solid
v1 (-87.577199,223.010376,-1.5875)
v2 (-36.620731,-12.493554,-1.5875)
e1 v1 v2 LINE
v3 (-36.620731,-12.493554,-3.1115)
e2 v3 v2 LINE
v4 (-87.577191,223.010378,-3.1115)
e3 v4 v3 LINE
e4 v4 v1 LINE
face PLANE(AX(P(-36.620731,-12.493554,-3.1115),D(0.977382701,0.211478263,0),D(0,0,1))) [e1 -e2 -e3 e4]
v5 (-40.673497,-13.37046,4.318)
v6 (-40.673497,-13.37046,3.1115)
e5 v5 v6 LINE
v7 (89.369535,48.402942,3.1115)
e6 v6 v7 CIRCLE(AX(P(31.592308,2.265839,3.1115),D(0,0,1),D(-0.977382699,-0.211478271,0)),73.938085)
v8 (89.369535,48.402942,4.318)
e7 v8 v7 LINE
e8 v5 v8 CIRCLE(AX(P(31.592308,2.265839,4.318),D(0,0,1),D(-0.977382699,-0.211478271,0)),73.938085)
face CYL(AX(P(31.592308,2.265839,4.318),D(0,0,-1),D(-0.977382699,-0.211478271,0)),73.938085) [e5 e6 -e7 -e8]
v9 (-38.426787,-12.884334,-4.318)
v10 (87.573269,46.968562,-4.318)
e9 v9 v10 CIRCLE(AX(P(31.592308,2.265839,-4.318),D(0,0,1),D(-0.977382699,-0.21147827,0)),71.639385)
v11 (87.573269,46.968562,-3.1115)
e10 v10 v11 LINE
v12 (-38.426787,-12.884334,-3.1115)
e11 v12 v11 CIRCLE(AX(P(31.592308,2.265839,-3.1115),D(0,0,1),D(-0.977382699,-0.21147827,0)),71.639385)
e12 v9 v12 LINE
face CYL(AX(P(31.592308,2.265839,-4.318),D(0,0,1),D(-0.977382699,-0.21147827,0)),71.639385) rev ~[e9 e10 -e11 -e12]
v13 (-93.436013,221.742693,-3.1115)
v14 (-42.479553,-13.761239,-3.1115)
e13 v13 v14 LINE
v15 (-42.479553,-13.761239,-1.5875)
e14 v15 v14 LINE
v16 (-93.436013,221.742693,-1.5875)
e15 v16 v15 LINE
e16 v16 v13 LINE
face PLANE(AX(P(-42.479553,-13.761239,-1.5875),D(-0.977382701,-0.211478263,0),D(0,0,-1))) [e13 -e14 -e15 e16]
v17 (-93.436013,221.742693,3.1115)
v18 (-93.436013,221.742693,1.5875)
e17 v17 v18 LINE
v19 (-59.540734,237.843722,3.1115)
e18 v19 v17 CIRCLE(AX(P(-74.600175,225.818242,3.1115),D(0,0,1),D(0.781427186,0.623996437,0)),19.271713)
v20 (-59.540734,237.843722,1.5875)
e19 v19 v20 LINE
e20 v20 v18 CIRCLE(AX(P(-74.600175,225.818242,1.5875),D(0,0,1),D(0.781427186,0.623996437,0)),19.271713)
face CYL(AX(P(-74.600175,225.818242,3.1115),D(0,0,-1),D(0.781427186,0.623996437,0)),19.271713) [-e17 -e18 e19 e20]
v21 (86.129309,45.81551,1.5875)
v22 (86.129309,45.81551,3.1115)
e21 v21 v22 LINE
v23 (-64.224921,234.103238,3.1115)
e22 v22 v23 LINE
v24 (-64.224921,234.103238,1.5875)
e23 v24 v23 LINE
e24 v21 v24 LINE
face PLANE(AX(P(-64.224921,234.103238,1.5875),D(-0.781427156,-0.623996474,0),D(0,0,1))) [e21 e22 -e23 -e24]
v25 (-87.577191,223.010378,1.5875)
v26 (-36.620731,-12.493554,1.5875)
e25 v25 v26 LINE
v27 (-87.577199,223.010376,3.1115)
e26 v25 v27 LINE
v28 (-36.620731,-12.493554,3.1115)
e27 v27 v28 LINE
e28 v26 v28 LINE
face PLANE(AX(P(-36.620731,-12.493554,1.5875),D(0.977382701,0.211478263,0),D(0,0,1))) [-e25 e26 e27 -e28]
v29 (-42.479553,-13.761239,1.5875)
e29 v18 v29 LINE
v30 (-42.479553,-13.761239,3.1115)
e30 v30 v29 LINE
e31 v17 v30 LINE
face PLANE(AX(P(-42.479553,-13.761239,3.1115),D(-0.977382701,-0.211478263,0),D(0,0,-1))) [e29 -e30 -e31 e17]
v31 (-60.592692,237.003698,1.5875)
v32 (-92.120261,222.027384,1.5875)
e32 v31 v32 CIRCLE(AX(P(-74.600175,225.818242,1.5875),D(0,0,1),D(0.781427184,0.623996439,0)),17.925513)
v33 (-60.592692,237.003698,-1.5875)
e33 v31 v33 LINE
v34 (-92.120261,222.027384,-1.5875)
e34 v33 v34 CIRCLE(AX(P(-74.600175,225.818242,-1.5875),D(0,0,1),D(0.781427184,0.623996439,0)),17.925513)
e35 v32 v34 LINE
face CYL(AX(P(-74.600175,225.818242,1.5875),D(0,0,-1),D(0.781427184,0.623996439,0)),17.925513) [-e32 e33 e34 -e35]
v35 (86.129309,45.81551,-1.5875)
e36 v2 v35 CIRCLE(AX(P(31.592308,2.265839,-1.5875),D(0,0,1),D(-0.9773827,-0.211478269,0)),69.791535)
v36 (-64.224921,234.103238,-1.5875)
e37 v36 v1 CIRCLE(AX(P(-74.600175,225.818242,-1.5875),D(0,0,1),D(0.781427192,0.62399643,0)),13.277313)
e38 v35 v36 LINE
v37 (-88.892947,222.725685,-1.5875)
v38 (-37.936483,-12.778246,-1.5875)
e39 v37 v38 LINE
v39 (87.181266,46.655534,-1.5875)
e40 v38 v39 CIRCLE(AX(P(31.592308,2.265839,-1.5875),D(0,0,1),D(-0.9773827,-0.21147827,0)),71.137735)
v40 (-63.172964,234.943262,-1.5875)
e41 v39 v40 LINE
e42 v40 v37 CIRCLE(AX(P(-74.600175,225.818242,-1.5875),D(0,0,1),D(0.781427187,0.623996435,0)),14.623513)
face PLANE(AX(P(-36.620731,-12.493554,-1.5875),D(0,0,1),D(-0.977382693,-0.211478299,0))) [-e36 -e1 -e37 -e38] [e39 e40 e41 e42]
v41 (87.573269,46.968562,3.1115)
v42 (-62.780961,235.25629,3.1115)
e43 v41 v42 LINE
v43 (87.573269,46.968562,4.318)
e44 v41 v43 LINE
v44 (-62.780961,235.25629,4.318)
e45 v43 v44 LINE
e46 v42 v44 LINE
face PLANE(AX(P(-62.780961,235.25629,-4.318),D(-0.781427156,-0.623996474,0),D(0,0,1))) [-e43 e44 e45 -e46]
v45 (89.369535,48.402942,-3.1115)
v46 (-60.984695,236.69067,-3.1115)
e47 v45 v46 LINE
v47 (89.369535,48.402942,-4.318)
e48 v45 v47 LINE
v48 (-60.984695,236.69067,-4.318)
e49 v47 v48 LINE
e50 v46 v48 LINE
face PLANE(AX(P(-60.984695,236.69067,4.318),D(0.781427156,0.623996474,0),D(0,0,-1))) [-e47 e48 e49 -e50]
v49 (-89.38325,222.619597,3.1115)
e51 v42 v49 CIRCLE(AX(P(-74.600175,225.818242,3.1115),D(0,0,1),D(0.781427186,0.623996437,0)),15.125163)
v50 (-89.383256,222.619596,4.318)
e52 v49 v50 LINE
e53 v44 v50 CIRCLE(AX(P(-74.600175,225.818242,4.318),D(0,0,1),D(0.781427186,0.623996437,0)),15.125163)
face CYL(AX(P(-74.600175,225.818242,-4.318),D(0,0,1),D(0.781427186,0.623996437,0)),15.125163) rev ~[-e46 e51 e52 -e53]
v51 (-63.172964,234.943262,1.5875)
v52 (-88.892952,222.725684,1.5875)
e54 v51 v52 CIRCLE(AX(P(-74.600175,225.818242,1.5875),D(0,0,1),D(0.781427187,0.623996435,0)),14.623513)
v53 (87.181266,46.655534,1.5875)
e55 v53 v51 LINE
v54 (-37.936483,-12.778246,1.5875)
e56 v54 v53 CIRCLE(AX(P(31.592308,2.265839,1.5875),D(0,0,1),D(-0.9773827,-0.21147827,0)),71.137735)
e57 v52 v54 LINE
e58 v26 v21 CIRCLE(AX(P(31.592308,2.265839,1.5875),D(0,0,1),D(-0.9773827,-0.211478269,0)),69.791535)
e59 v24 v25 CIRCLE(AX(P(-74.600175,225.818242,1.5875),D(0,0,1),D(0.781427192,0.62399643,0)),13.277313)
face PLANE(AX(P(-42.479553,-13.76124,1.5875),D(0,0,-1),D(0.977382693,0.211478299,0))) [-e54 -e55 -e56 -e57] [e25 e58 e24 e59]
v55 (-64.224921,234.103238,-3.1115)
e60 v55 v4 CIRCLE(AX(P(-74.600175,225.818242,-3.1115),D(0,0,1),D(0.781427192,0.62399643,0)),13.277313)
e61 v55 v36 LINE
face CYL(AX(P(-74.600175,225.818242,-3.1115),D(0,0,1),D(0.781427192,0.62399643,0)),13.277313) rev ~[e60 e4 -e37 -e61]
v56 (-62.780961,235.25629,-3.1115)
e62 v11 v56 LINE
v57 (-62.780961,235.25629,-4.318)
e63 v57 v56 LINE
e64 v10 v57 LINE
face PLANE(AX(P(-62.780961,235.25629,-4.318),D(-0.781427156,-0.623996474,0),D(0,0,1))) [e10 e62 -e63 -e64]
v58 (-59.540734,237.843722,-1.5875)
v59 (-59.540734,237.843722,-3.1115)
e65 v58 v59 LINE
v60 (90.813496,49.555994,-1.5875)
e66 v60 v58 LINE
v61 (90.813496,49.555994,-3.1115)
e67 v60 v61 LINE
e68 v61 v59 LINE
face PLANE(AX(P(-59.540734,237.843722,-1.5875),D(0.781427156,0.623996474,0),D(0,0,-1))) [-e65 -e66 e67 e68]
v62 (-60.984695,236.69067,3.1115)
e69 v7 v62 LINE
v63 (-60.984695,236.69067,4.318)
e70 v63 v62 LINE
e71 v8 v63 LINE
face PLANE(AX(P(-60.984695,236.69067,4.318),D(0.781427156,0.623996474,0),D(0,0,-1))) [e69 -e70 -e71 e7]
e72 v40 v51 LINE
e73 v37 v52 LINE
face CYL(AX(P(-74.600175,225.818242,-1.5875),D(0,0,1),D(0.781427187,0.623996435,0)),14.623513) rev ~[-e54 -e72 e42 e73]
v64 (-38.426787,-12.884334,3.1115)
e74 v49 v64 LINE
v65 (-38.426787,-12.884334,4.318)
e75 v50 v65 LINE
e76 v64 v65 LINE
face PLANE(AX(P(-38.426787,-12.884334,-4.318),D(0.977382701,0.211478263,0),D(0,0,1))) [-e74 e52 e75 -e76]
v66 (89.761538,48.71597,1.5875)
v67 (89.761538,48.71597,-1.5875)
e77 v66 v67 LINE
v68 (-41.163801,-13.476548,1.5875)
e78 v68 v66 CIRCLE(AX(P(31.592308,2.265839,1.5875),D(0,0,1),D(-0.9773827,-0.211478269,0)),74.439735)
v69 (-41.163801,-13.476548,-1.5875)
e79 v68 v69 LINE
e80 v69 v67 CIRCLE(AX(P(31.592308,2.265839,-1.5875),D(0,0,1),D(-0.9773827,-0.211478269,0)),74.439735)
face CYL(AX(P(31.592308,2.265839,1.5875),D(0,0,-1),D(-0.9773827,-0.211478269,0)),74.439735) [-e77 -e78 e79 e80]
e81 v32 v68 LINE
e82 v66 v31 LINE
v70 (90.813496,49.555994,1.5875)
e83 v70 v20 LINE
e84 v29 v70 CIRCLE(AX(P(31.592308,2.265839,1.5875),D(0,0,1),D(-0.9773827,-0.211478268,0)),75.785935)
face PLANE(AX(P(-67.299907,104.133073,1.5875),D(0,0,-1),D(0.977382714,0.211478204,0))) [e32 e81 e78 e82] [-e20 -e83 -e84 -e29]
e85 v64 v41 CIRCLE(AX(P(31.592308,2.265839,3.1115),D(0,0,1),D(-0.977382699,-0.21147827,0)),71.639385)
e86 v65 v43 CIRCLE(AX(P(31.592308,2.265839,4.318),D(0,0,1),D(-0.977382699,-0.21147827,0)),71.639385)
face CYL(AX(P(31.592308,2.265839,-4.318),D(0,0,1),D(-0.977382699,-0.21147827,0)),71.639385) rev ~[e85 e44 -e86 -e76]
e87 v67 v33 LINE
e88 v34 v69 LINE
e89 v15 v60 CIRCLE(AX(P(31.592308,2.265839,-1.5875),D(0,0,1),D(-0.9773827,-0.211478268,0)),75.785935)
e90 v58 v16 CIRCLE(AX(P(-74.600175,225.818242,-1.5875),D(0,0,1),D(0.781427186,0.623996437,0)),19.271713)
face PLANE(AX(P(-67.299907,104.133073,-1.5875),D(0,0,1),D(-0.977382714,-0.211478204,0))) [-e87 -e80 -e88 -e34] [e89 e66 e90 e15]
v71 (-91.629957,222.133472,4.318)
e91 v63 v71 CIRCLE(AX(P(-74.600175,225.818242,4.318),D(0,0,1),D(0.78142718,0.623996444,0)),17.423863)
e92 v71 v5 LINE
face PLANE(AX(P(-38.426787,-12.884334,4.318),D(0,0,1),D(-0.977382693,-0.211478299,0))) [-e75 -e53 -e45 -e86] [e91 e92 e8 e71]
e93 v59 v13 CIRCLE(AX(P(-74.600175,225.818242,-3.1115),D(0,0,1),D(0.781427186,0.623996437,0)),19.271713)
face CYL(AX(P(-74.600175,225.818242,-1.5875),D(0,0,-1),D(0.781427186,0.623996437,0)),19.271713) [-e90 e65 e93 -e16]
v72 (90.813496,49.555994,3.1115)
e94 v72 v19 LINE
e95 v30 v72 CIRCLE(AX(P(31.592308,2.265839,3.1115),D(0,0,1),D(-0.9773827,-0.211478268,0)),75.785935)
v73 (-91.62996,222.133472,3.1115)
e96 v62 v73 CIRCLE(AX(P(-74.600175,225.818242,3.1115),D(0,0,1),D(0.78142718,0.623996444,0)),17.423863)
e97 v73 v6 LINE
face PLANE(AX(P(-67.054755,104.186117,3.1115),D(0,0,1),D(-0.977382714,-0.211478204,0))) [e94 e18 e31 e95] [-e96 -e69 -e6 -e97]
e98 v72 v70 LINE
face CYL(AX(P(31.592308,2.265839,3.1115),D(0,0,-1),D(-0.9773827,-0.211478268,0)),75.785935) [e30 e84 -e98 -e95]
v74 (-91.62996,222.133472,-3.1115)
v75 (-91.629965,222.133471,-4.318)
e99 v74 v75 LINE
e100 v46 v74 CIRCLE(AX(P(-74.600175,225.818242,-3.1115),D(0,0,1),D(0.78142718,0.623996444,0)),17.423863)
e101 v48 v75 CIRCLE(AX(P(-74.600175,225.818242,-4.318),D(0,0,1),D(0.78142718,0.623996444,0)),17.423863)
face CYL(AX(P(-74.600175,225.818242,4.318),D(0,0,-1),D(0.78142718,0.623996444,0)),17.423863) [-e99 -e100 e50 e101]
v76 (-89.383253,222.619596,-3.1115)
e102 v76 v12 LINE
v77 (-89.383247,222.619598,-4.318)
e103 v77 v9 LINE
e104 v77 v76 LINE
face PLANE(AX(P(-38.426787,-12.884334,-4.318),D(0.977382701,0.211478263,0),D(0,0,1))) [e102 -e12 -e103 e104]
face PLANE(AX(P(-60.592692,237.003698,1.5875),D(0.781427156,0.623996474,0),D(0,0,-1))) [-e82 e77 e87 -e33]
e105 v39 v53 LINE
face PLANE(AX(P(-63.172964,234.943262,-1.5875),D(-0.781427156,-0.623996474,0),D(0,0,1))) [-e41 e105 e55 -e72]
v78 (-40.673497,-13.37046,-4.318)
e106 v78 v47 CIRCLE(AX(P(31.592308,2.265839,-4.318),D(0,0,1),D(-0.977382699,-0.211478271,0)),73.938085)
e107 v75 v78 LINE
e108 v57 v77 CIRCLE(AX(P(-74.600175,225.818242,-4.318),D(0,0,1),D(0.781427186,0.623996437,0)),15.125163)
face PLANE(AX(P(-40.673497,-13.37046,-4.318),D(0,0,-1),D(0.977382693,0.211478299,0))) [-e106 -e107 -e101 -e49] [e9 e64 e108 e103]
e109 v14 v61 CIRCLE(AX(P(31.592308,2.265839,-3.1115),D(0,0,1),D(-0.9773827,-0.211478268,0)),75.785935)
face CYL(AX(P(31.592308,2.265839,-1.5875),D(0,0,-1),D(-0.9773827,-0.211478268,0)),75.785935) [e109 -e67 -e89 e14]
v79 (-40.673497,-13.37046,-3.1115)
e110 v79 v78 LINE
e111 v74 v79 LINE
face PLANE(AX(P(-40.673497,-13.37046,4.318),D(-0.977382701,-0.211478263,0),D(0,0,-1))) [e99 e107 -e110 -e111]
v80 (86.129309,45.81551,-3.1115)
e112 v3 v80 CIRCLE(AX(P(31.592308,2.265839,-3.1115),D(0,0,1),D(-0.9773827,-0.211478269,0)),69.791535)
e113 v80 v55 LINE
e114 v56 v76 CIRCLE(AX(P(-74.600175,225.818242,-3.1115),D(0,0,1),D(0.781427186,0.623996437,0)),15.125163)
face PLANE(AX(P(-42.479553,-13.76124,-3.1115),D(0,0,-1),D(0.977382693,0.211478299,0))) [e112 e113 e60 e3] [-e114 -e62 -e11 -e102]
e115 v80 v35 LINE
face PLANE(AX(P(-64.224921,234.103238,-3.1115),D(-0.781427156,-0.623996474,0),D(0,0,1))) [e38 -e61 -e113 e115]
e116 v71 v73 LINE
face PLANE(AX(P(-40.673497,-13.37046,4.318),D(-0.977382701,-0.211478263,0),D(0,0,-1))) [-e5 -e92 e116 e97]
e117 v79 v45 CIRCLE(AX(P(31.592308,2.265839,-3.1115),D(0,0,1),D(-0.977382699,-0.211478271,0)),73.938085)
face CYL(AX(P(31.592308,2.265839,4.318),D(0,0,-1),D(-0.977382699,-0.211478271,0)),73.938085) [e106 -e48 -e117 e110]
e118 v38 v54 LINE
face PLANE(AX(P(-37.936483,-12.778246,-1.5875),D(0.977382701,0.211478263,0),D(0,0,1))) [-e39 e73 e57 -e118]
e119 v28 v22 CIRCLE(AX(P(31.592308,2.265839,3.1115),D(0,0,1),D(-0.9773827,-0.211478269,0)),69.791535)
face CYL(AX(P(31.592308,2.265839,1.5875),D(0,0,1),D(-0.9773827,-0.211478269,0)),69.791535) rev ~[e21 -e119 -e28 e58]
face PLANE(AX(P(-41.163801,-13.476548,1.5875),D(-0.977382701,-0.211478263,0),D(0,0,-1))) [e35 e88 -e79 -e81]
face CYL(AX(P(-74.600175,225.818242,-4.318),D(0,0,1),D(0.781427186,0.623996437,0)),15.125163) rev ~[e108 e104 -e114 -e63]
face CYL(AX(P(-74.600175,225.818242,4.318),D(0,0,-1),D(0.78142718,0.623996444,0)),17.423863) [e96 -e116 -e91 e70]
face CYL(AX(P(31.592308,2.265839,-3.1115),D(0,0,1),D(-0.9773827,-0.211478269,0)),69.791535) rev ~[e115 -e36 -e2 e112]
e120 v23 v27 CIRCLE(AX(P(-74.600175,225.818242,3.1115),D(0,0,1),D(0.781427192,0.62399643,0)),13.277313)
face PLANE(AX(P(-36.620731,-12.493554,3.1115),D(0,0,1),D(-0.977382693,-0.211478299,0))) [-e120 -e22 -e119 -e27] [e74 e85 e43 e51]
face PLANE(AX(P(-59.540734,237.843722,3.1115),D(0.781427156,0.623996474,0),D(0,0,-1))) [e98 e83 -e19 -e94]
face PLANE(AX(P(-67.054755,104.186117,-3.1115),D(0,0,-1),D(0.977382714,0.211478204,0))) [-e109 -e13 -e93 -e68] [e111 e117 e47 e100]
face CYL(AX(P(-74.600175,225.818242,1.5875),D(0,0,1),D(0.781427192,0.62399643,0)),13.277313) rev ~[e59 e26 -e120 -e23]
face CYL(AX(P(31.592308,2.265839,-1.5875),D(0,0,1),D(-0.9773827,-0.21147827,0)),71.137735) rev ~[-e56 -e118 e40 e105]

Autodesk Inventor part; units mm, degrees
ref_plane "Work Plane2" through (-74.600175, 225.818241, 0) normal (0.9238795, 0.3826834, 0) x (0, 0, 1)
ref_plane "Work Plane3" through (31.592308, 2.265839, 0) normal (-0.5701833, 0.8215175, 0) x (0, 0, 1)
sketch "Path" plane through (0, 0, 0) normal (0, 0, 1) x (1, 0, 0)
  arc A0 (-61.882828, 235.97348) -> (-90.506602, 222.376535) centre (-74.600175, 225.818241) ccw
  arc A1 (-39.550142, -13.127397) -> (88.471402, 47.685752) centre (31.592308, 2.265839) ccw
  line L0 (-39.550142, -13.127397) -> (-90.506602, 222.376535)
  line L1 (-61.882828, 235.97348) -> (88.471402, 47.685752)
  dimension "d31" = 5.9944
ref_plane "Section Plane" through (-90.506602, 222.376535, 0) normal (0.2114783, -0.9773827, 0) x (0, 0, 1)
sketch "Section Sketch" plane through (-90.506602, 222.376535, 0) normal (0.2114783, -0.9773827, 0) x (0, 0, 1)
  line L0 (-4.318, -1.14935) -> (4.318, -1.14935)
  line L1 (4.318, -1.14935) -> (4.318, 1.14935)
  line L2 (4.318, 1.14935) -> (-4.318, 1.14935)
  line L3 (-4.318, 1.14935) -> (-4.318, -1.14935)
  line L4 (-1.5875, -1.651) -> (1.5875, -1.651)
  line L5 (1.5875, -1.651) -> (1.5875, 1.651)
  line L6 (1.5875, 1.651) -> (-1.5875, 1.651)
  line L7 (-1.5875, 1.651) -> (-1.5875, -1.651)
  line L8 (-1.5875, 0) -> (1.5875, 0) construction
  line L9 (-3.1115, -2.9972) -> (-1.5875, -2.9972)
  line L10 (-1.5875, -2.9972) -> (-1.5875, 2.9972)
  line L11 (-1.5875, 2.9972) -> (-3.1115, 2.9972)
  line L12 (-3.1115, 2.9972) -> (-3.1115, -2.9972)
  line L13 (1.5875, -2.9972) -> (3.1115, -2.9972)
  line L14 (3.1115, -2.9972) -> (3.1115, 2.9972)
  line L15 (3.1115, 2.9972) -> (1.5875, 2.9972)
  line L16 (1.5875, 2.9972) -> (1.5875, -2.9972)
  line L17 (-4.318, 0) -> (4.318, 0) construction
  point P0 (0, 0)
  point P1 (0, 0)
  dimension "d21" = 2.2987
  dimension "d22" = 3.302
  dimension "d23" = 3.175
  dimension "d24" = 1.524
  dimension "d31" = 5.9944
  dimension "d32" = 8.636
sweep "Solid" add profiles "Section Sketch" path "Path"
pattern_of_one "Strand Pattern"
equation "\"d21\" = da_d2"
equation "\"d22\" = da_d1"
equation "\"d23\" = da_b1"
equation "\"d24\" = da_t1 + da_t2"
equation "\"d30\" = da_pt"
equation "\"da_p\" = 6.35"
equation "\"da_b1\" = 3.175"
equation "\"da_h2\" = 5.9944"
equation "\"da_h3\" = 5.207"
equation "\"da_d1\" = 3.302"
equation "\"da_d2\" = 2.2987"
equation "\"da_pt\" = 6.4008"
equation "\"da_b\" = 8.636"
equation "\"da_t1\" = 0.762"
equation "\"da_t2\" = 0.762"
properties part number "Roller Chain"
